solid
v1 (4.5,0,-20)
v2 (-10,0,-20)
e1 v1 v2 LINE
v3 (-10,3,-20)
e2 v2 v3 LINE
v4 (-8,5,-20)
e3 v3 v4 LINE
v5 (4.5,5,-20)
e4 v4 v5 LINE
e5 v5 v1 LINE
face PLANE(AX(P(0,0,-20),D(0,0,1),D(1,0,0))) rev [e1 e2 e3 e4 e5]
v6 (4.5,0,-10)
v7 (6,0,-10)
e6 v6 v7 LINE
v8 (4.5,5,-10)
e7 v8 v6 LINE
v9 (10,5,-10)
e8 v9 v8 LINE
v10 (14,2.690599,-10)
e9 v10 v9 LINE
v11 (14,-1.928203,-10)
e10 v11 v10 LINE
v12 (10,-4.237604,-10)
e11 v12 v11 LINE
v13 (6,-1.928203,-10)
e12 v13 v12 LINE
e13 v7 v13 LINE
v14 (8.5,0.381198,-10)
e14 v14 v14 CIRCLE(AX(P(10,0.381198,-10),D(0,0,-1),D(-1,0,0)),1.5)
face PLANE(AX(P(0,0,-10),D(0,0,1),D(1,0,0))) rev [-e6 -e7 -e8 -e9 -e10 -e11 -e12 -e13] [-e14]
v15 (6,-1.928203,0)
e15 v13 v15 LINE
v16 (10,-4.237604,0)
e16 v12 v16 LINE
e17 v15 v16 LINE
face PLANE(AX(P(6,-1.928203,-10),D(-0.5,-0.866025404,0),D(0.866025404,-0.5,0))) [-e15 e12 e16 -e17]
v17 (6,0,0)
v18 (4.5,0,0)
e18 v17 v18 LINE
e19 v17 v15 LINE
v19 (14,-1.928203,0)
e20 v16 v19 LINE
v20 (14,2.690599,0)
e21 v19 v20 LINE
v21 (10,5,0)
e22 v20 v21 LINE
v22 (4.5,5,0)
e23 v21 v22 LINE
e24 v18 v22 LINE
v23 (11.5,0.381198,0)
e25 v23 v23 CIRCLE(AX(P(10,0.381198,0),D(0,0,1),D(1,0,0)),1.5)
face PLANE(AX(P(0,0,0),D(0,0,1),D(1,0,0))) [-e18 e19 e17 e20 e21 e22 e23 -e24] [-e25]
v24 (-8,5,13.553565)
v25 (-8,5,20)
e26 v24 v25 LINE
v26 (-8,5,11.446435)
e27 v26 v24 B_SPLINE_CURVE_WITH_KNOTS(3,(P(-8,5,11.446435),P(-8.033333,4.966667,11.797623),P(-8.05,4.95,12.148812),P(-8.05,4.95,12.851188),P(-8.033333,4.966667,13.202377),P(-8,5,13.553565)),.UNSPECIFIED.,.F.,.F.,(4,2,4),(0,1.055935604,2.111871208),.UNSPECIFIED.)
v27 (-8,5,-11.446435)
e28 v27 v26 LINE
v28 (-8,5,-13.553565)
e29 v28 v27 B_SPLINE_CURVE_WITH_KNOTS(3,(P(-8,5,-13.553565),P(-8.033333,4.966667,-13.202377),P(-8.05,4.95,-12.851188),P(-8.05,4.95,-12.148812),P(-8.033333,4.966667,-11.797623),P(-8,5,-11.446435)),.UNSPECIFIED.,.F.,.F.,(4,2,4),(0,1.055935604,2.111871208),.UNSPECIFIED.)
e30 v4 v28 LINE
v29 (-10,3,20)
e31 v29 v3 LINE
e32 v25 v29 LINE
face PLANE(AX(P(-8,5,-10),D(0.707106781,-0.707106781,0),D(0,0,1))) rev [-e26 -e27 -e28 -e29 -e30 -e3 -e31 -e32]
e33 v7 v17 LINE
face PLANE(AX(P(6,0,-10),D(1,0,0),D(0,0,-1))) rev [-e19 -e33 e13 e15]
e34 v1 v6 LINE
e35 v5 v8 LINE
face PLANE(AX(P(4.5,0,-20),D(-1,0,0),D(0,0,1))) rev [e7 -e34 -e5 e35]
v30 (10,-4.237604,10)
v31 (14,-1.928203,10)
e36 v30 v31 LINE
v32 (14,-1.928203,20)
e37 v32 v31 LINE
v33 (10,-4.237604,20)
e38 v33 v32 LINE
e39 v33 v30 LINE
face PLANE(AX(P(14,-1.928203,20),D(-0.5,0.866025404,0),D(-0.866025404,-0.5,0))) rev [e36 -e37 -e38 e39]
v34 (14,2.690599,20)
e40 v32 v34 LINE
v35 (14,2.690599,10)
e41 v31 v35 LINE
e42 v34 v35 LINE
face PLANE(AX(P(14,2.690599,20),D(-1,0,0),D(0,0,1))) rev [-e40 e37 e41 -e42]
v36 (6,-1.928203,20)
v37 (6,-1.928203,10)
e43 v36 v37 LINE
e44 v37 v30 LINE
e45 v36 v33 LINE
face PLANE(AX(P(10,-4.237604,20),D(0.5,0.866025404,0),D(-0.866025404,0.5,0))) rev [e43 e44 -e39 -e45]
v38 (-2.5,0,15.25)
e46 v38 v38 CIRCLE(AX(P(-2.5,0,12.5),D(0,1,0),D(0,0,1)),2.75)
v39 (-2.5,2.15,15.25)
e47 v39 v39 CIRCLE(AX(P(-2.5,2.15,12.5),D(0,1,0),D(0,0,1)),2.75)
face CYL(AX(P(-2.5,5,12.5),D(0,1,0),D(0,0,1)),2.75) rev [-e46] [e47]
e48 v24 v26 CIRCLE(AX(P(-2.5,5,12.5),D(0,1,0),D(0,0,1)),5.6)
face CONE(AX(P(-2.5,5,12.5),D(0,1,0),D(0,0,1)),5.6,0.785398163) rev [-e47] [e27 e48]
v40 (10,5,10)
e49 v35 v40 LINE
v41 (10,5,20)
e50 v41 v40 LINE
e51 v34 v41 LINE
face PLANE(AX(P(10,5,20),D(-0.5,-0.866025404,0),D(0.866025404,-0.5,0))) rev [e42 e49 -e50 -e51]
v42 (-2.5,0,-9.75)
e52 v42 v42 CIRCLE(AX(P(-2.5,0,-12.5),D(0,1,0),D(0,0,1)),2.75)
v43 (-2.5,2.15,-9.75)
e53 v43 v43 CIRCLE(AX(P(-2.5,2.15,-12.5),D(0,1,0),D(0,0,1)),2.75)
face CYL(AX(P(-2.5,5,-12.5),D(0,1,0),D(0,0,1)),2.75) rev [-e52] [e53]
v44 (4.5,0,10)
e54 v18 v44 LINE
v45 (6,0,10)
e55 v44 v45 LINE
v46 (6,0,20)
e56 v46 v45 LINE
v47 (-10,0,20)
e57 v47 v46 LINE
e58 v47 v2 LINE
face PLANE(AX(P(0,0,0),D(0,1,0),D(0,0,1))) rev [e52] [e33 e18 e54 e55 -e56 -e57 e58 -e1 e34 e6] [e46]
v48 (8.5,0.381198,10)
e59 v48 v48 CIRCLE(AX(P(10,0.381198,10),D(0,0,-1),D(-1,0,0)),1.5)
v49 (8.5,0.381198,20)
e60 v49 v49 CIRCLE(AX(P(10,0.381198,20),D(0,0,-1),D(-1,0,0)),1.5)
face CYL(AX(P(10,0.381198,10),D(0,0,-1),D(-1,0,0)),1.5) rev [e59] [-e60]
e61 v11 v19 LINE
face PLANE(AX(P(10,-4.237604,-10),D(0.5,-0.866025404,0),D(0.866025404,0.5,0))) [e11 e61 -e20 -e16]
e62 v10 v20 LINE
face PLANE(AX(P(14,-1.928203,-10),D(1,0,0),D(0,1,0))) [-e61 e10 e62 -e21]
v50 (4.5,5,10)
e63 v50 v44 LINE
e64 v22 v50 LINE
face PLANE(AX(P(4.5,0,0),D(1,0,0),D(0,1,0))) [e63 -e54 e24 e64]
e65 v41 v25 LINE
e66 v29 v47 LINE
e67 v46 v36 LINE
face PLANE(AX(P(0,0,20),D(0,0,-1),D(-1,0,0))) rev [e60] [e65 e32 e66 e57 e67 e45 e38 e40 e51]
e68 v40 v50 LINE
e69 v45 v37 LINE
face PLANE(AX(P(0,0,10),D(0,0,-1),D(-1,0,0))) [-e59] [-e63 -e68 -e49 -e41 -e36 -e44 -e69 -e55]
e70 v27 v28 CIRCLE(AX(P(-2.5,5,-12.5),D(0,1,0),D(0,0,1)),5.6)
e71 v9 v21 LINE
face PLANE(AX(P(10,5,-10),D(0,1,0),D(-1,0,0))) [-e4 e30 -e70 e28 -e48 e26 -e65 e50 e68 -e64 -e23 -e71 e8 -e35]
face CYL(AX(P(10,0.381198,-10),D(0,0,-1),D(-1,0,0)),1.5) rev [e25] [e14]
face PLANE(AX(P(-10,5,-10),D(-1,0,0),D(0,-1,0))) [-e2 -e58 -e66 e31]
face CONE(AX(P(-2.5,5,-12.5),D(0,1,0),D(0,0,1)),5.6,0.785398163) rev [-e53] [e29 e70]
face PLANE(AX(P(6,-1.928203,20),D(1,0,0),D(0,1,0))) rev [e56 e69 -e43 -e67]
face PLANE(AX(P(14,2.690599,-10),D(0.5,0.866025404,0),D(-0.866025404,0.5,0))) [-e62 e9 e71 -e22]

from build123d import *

# Parameters (mm, degrees)
EXTRUDE_1_DEPTH              = 10
SKETCH_2_W                   = 16
SKETCH_2_H                   = 6.92820323
EXTRUDE_2_DEPTH              = 10
SKETCH_3_W                   = 10
SKETCH_3_H                   = 6.92820323
CUT_EXTRUDE_1_DEPTH          = 1.5
CUT_EXTRUDE_2_DEPTH          = 1.92820323
EXTRUDE_3_DEPTH              = 10
SKETCH_6_W                   = 14.5
SKETCH_6_H                   = 5
EXTRUDE_4_DEPTH              = 10
HOLE_WIZARD_3_0_3_1_D        = 3
HOLE_WIZARD_3_0_3_1_DEPTH    = 10
HOLE_WIZARD_M5_1_D           = 5.5
HOLE_WIZARD_M5_1_DEPTH       = 9.237604307
HOLE_WIZARD_M5_1_CSINK_D     = 11.2
HOLE_WIZARD_M5_1_CSINK_ANGLE = 90
HOLE_WIZARD_3_0_3_2_D        = 3
HOLE_WIZARD_3_0_3_2_DEPTH    = 30
CHAMFER_1_SIZE               = 2


with BuildPart() as part:
    # 草图1 → 凸台-拉伸1 (new body)
    with BuildSketch(Plane.XY):
        Polygon((10, 5), (-10, 5), (-10, -1.92820323), (6, -1.92820323), (10, -4.237604307), (14, -1.92820323), (14, 2.690598923), align=None)
    extrude(amount=-EXTRUDE_1_DEPTH)

    # 草图2 → 凸台-拉伸2 (add)
    with BuildSketch(Plane.XY):
        with Locations((-2, 1.535898385)):
            Rectangle(SKETCH_2_W, SKETCH_2_H)
    extrude(amount=EXTRUDE_2_DEPTH)

    # 草图3 → 切除-拉伸1 (cut)
    with BuildSketch(Plane(origin=(6, 0, 0), x_dir=(0, 0, -1), z_dir=(1, 0, 0))):
        with Locations((-5, 1.535898385)):
            Rectangle(SKETCH_3_W, SKETCH_3_H)
    extrude(amount=-CUT_EXTRUDE_1_DEPTH, mode=Mode.SUBTRACT)

    # 草图4 → 切除-拉伸2 (cut)
    with BuildSketch(Plane.XZ.offset(1.92820323)):
        Polygon((4.5, 0), (4.5, 10), (-10, 10), (-10, -10), (6, -10), (6, 0), align=None)
    extrude(amount=-CUT_EXTRUDE_2_DEPTH, mode=Mode.SUBTRACT)

    # 草图5 → 凸台-拉伸3 (add)
    with BuildSketch(Plane.XY.offset(10)):
        Polygon((-10, 5), (10, 5), (14, 2.690598923), (14, -1.92820323), (10, -4.237604307), (6, -1.92820323), (6, 0), (-10, 0), align=None)
    extrude(amount=EXTRUDE_3_DEPTH)

    # 草图6 → 凸台-拉伸4 (add)
    with BuildSketch(Plane(origin=(0, 0, -10), x_dir=(-1, 0, 0), z_dir=(0, 0, -1))):
        with Locations((2.75, 2.5)):
            Rectangle(SKETCH_6_W, SKETCH_6_H)
    extrude(amount=EXTRUDE_4_DEPTH)

    # Ø3.0 (3) 直径孔1
    with Locations(Plane(origin=(0, 0, 10), x_dir=(-1, 0, 0), z_dir=(0, 0, -1))):
        with Locations((-10, 0.381197846)):
            Hole(HOLE_WIZARD_3_0_3_1_D / 2, depth=HOLE_WIZARD_3_0_3_1_DEPTH)

    # M5 平头机械螺钉的锥形沉头孔1
    with Locations(Plane(origin=(0, 5, 0), x_dir=(1, 0, 0), z_dir=(0, 1, 0))):
        with Locations((-2.5, 12.5), (-2.5, -12.5)):
            CounterSinkHole(HOLE_WIZARD_M5_1_D / 2, HOLE_WIZARD_M5_1_CSINK_D / 2, depth=HOLE_WIZARD_M5_1_DEPTH, counter_sink_angle=HOLE_WIZARD_M5_1_CSINK_ANGLE)

    # Ø3.0 (3) 直径孔2
    with Locations(Plane(origin=(0, 0, -10), x_dir=(-1, 0, 0), z_dir=(0, 0, -1))):
        with Locations((-10, 0.381197846)):
            Hole(HOLE_WIZARD_3_0_3_2_D / 2, depth=HOLE_WIZARD_3_0_3_2_DEPTH)

    # 倒角1
    # the kernel refuses this chamfer: 2 mm, written as the material it takes off along each edge
    with BuildSketch(Plane(origin=(-10, 5, -25.143365976), x_dir=(0.9996219169112968, 0.027495876610586487, 0), z_dir=(0, 0, 1))) as chamfer_1_piece_1:
        Polygon((CHAMFER_1_SIZE * 0.999621916911, -CHAMFER_1_SIZE * 0.0274958766106), (-CHAMFER_1_SIZE * 0.0274958766106, -CHAMFER_1_SIZE * 0.999621916911), (0, 0), align=None)
    extrude(amount=50.286731952, mode=Mode.SUBTRACT)


solid = part.part
